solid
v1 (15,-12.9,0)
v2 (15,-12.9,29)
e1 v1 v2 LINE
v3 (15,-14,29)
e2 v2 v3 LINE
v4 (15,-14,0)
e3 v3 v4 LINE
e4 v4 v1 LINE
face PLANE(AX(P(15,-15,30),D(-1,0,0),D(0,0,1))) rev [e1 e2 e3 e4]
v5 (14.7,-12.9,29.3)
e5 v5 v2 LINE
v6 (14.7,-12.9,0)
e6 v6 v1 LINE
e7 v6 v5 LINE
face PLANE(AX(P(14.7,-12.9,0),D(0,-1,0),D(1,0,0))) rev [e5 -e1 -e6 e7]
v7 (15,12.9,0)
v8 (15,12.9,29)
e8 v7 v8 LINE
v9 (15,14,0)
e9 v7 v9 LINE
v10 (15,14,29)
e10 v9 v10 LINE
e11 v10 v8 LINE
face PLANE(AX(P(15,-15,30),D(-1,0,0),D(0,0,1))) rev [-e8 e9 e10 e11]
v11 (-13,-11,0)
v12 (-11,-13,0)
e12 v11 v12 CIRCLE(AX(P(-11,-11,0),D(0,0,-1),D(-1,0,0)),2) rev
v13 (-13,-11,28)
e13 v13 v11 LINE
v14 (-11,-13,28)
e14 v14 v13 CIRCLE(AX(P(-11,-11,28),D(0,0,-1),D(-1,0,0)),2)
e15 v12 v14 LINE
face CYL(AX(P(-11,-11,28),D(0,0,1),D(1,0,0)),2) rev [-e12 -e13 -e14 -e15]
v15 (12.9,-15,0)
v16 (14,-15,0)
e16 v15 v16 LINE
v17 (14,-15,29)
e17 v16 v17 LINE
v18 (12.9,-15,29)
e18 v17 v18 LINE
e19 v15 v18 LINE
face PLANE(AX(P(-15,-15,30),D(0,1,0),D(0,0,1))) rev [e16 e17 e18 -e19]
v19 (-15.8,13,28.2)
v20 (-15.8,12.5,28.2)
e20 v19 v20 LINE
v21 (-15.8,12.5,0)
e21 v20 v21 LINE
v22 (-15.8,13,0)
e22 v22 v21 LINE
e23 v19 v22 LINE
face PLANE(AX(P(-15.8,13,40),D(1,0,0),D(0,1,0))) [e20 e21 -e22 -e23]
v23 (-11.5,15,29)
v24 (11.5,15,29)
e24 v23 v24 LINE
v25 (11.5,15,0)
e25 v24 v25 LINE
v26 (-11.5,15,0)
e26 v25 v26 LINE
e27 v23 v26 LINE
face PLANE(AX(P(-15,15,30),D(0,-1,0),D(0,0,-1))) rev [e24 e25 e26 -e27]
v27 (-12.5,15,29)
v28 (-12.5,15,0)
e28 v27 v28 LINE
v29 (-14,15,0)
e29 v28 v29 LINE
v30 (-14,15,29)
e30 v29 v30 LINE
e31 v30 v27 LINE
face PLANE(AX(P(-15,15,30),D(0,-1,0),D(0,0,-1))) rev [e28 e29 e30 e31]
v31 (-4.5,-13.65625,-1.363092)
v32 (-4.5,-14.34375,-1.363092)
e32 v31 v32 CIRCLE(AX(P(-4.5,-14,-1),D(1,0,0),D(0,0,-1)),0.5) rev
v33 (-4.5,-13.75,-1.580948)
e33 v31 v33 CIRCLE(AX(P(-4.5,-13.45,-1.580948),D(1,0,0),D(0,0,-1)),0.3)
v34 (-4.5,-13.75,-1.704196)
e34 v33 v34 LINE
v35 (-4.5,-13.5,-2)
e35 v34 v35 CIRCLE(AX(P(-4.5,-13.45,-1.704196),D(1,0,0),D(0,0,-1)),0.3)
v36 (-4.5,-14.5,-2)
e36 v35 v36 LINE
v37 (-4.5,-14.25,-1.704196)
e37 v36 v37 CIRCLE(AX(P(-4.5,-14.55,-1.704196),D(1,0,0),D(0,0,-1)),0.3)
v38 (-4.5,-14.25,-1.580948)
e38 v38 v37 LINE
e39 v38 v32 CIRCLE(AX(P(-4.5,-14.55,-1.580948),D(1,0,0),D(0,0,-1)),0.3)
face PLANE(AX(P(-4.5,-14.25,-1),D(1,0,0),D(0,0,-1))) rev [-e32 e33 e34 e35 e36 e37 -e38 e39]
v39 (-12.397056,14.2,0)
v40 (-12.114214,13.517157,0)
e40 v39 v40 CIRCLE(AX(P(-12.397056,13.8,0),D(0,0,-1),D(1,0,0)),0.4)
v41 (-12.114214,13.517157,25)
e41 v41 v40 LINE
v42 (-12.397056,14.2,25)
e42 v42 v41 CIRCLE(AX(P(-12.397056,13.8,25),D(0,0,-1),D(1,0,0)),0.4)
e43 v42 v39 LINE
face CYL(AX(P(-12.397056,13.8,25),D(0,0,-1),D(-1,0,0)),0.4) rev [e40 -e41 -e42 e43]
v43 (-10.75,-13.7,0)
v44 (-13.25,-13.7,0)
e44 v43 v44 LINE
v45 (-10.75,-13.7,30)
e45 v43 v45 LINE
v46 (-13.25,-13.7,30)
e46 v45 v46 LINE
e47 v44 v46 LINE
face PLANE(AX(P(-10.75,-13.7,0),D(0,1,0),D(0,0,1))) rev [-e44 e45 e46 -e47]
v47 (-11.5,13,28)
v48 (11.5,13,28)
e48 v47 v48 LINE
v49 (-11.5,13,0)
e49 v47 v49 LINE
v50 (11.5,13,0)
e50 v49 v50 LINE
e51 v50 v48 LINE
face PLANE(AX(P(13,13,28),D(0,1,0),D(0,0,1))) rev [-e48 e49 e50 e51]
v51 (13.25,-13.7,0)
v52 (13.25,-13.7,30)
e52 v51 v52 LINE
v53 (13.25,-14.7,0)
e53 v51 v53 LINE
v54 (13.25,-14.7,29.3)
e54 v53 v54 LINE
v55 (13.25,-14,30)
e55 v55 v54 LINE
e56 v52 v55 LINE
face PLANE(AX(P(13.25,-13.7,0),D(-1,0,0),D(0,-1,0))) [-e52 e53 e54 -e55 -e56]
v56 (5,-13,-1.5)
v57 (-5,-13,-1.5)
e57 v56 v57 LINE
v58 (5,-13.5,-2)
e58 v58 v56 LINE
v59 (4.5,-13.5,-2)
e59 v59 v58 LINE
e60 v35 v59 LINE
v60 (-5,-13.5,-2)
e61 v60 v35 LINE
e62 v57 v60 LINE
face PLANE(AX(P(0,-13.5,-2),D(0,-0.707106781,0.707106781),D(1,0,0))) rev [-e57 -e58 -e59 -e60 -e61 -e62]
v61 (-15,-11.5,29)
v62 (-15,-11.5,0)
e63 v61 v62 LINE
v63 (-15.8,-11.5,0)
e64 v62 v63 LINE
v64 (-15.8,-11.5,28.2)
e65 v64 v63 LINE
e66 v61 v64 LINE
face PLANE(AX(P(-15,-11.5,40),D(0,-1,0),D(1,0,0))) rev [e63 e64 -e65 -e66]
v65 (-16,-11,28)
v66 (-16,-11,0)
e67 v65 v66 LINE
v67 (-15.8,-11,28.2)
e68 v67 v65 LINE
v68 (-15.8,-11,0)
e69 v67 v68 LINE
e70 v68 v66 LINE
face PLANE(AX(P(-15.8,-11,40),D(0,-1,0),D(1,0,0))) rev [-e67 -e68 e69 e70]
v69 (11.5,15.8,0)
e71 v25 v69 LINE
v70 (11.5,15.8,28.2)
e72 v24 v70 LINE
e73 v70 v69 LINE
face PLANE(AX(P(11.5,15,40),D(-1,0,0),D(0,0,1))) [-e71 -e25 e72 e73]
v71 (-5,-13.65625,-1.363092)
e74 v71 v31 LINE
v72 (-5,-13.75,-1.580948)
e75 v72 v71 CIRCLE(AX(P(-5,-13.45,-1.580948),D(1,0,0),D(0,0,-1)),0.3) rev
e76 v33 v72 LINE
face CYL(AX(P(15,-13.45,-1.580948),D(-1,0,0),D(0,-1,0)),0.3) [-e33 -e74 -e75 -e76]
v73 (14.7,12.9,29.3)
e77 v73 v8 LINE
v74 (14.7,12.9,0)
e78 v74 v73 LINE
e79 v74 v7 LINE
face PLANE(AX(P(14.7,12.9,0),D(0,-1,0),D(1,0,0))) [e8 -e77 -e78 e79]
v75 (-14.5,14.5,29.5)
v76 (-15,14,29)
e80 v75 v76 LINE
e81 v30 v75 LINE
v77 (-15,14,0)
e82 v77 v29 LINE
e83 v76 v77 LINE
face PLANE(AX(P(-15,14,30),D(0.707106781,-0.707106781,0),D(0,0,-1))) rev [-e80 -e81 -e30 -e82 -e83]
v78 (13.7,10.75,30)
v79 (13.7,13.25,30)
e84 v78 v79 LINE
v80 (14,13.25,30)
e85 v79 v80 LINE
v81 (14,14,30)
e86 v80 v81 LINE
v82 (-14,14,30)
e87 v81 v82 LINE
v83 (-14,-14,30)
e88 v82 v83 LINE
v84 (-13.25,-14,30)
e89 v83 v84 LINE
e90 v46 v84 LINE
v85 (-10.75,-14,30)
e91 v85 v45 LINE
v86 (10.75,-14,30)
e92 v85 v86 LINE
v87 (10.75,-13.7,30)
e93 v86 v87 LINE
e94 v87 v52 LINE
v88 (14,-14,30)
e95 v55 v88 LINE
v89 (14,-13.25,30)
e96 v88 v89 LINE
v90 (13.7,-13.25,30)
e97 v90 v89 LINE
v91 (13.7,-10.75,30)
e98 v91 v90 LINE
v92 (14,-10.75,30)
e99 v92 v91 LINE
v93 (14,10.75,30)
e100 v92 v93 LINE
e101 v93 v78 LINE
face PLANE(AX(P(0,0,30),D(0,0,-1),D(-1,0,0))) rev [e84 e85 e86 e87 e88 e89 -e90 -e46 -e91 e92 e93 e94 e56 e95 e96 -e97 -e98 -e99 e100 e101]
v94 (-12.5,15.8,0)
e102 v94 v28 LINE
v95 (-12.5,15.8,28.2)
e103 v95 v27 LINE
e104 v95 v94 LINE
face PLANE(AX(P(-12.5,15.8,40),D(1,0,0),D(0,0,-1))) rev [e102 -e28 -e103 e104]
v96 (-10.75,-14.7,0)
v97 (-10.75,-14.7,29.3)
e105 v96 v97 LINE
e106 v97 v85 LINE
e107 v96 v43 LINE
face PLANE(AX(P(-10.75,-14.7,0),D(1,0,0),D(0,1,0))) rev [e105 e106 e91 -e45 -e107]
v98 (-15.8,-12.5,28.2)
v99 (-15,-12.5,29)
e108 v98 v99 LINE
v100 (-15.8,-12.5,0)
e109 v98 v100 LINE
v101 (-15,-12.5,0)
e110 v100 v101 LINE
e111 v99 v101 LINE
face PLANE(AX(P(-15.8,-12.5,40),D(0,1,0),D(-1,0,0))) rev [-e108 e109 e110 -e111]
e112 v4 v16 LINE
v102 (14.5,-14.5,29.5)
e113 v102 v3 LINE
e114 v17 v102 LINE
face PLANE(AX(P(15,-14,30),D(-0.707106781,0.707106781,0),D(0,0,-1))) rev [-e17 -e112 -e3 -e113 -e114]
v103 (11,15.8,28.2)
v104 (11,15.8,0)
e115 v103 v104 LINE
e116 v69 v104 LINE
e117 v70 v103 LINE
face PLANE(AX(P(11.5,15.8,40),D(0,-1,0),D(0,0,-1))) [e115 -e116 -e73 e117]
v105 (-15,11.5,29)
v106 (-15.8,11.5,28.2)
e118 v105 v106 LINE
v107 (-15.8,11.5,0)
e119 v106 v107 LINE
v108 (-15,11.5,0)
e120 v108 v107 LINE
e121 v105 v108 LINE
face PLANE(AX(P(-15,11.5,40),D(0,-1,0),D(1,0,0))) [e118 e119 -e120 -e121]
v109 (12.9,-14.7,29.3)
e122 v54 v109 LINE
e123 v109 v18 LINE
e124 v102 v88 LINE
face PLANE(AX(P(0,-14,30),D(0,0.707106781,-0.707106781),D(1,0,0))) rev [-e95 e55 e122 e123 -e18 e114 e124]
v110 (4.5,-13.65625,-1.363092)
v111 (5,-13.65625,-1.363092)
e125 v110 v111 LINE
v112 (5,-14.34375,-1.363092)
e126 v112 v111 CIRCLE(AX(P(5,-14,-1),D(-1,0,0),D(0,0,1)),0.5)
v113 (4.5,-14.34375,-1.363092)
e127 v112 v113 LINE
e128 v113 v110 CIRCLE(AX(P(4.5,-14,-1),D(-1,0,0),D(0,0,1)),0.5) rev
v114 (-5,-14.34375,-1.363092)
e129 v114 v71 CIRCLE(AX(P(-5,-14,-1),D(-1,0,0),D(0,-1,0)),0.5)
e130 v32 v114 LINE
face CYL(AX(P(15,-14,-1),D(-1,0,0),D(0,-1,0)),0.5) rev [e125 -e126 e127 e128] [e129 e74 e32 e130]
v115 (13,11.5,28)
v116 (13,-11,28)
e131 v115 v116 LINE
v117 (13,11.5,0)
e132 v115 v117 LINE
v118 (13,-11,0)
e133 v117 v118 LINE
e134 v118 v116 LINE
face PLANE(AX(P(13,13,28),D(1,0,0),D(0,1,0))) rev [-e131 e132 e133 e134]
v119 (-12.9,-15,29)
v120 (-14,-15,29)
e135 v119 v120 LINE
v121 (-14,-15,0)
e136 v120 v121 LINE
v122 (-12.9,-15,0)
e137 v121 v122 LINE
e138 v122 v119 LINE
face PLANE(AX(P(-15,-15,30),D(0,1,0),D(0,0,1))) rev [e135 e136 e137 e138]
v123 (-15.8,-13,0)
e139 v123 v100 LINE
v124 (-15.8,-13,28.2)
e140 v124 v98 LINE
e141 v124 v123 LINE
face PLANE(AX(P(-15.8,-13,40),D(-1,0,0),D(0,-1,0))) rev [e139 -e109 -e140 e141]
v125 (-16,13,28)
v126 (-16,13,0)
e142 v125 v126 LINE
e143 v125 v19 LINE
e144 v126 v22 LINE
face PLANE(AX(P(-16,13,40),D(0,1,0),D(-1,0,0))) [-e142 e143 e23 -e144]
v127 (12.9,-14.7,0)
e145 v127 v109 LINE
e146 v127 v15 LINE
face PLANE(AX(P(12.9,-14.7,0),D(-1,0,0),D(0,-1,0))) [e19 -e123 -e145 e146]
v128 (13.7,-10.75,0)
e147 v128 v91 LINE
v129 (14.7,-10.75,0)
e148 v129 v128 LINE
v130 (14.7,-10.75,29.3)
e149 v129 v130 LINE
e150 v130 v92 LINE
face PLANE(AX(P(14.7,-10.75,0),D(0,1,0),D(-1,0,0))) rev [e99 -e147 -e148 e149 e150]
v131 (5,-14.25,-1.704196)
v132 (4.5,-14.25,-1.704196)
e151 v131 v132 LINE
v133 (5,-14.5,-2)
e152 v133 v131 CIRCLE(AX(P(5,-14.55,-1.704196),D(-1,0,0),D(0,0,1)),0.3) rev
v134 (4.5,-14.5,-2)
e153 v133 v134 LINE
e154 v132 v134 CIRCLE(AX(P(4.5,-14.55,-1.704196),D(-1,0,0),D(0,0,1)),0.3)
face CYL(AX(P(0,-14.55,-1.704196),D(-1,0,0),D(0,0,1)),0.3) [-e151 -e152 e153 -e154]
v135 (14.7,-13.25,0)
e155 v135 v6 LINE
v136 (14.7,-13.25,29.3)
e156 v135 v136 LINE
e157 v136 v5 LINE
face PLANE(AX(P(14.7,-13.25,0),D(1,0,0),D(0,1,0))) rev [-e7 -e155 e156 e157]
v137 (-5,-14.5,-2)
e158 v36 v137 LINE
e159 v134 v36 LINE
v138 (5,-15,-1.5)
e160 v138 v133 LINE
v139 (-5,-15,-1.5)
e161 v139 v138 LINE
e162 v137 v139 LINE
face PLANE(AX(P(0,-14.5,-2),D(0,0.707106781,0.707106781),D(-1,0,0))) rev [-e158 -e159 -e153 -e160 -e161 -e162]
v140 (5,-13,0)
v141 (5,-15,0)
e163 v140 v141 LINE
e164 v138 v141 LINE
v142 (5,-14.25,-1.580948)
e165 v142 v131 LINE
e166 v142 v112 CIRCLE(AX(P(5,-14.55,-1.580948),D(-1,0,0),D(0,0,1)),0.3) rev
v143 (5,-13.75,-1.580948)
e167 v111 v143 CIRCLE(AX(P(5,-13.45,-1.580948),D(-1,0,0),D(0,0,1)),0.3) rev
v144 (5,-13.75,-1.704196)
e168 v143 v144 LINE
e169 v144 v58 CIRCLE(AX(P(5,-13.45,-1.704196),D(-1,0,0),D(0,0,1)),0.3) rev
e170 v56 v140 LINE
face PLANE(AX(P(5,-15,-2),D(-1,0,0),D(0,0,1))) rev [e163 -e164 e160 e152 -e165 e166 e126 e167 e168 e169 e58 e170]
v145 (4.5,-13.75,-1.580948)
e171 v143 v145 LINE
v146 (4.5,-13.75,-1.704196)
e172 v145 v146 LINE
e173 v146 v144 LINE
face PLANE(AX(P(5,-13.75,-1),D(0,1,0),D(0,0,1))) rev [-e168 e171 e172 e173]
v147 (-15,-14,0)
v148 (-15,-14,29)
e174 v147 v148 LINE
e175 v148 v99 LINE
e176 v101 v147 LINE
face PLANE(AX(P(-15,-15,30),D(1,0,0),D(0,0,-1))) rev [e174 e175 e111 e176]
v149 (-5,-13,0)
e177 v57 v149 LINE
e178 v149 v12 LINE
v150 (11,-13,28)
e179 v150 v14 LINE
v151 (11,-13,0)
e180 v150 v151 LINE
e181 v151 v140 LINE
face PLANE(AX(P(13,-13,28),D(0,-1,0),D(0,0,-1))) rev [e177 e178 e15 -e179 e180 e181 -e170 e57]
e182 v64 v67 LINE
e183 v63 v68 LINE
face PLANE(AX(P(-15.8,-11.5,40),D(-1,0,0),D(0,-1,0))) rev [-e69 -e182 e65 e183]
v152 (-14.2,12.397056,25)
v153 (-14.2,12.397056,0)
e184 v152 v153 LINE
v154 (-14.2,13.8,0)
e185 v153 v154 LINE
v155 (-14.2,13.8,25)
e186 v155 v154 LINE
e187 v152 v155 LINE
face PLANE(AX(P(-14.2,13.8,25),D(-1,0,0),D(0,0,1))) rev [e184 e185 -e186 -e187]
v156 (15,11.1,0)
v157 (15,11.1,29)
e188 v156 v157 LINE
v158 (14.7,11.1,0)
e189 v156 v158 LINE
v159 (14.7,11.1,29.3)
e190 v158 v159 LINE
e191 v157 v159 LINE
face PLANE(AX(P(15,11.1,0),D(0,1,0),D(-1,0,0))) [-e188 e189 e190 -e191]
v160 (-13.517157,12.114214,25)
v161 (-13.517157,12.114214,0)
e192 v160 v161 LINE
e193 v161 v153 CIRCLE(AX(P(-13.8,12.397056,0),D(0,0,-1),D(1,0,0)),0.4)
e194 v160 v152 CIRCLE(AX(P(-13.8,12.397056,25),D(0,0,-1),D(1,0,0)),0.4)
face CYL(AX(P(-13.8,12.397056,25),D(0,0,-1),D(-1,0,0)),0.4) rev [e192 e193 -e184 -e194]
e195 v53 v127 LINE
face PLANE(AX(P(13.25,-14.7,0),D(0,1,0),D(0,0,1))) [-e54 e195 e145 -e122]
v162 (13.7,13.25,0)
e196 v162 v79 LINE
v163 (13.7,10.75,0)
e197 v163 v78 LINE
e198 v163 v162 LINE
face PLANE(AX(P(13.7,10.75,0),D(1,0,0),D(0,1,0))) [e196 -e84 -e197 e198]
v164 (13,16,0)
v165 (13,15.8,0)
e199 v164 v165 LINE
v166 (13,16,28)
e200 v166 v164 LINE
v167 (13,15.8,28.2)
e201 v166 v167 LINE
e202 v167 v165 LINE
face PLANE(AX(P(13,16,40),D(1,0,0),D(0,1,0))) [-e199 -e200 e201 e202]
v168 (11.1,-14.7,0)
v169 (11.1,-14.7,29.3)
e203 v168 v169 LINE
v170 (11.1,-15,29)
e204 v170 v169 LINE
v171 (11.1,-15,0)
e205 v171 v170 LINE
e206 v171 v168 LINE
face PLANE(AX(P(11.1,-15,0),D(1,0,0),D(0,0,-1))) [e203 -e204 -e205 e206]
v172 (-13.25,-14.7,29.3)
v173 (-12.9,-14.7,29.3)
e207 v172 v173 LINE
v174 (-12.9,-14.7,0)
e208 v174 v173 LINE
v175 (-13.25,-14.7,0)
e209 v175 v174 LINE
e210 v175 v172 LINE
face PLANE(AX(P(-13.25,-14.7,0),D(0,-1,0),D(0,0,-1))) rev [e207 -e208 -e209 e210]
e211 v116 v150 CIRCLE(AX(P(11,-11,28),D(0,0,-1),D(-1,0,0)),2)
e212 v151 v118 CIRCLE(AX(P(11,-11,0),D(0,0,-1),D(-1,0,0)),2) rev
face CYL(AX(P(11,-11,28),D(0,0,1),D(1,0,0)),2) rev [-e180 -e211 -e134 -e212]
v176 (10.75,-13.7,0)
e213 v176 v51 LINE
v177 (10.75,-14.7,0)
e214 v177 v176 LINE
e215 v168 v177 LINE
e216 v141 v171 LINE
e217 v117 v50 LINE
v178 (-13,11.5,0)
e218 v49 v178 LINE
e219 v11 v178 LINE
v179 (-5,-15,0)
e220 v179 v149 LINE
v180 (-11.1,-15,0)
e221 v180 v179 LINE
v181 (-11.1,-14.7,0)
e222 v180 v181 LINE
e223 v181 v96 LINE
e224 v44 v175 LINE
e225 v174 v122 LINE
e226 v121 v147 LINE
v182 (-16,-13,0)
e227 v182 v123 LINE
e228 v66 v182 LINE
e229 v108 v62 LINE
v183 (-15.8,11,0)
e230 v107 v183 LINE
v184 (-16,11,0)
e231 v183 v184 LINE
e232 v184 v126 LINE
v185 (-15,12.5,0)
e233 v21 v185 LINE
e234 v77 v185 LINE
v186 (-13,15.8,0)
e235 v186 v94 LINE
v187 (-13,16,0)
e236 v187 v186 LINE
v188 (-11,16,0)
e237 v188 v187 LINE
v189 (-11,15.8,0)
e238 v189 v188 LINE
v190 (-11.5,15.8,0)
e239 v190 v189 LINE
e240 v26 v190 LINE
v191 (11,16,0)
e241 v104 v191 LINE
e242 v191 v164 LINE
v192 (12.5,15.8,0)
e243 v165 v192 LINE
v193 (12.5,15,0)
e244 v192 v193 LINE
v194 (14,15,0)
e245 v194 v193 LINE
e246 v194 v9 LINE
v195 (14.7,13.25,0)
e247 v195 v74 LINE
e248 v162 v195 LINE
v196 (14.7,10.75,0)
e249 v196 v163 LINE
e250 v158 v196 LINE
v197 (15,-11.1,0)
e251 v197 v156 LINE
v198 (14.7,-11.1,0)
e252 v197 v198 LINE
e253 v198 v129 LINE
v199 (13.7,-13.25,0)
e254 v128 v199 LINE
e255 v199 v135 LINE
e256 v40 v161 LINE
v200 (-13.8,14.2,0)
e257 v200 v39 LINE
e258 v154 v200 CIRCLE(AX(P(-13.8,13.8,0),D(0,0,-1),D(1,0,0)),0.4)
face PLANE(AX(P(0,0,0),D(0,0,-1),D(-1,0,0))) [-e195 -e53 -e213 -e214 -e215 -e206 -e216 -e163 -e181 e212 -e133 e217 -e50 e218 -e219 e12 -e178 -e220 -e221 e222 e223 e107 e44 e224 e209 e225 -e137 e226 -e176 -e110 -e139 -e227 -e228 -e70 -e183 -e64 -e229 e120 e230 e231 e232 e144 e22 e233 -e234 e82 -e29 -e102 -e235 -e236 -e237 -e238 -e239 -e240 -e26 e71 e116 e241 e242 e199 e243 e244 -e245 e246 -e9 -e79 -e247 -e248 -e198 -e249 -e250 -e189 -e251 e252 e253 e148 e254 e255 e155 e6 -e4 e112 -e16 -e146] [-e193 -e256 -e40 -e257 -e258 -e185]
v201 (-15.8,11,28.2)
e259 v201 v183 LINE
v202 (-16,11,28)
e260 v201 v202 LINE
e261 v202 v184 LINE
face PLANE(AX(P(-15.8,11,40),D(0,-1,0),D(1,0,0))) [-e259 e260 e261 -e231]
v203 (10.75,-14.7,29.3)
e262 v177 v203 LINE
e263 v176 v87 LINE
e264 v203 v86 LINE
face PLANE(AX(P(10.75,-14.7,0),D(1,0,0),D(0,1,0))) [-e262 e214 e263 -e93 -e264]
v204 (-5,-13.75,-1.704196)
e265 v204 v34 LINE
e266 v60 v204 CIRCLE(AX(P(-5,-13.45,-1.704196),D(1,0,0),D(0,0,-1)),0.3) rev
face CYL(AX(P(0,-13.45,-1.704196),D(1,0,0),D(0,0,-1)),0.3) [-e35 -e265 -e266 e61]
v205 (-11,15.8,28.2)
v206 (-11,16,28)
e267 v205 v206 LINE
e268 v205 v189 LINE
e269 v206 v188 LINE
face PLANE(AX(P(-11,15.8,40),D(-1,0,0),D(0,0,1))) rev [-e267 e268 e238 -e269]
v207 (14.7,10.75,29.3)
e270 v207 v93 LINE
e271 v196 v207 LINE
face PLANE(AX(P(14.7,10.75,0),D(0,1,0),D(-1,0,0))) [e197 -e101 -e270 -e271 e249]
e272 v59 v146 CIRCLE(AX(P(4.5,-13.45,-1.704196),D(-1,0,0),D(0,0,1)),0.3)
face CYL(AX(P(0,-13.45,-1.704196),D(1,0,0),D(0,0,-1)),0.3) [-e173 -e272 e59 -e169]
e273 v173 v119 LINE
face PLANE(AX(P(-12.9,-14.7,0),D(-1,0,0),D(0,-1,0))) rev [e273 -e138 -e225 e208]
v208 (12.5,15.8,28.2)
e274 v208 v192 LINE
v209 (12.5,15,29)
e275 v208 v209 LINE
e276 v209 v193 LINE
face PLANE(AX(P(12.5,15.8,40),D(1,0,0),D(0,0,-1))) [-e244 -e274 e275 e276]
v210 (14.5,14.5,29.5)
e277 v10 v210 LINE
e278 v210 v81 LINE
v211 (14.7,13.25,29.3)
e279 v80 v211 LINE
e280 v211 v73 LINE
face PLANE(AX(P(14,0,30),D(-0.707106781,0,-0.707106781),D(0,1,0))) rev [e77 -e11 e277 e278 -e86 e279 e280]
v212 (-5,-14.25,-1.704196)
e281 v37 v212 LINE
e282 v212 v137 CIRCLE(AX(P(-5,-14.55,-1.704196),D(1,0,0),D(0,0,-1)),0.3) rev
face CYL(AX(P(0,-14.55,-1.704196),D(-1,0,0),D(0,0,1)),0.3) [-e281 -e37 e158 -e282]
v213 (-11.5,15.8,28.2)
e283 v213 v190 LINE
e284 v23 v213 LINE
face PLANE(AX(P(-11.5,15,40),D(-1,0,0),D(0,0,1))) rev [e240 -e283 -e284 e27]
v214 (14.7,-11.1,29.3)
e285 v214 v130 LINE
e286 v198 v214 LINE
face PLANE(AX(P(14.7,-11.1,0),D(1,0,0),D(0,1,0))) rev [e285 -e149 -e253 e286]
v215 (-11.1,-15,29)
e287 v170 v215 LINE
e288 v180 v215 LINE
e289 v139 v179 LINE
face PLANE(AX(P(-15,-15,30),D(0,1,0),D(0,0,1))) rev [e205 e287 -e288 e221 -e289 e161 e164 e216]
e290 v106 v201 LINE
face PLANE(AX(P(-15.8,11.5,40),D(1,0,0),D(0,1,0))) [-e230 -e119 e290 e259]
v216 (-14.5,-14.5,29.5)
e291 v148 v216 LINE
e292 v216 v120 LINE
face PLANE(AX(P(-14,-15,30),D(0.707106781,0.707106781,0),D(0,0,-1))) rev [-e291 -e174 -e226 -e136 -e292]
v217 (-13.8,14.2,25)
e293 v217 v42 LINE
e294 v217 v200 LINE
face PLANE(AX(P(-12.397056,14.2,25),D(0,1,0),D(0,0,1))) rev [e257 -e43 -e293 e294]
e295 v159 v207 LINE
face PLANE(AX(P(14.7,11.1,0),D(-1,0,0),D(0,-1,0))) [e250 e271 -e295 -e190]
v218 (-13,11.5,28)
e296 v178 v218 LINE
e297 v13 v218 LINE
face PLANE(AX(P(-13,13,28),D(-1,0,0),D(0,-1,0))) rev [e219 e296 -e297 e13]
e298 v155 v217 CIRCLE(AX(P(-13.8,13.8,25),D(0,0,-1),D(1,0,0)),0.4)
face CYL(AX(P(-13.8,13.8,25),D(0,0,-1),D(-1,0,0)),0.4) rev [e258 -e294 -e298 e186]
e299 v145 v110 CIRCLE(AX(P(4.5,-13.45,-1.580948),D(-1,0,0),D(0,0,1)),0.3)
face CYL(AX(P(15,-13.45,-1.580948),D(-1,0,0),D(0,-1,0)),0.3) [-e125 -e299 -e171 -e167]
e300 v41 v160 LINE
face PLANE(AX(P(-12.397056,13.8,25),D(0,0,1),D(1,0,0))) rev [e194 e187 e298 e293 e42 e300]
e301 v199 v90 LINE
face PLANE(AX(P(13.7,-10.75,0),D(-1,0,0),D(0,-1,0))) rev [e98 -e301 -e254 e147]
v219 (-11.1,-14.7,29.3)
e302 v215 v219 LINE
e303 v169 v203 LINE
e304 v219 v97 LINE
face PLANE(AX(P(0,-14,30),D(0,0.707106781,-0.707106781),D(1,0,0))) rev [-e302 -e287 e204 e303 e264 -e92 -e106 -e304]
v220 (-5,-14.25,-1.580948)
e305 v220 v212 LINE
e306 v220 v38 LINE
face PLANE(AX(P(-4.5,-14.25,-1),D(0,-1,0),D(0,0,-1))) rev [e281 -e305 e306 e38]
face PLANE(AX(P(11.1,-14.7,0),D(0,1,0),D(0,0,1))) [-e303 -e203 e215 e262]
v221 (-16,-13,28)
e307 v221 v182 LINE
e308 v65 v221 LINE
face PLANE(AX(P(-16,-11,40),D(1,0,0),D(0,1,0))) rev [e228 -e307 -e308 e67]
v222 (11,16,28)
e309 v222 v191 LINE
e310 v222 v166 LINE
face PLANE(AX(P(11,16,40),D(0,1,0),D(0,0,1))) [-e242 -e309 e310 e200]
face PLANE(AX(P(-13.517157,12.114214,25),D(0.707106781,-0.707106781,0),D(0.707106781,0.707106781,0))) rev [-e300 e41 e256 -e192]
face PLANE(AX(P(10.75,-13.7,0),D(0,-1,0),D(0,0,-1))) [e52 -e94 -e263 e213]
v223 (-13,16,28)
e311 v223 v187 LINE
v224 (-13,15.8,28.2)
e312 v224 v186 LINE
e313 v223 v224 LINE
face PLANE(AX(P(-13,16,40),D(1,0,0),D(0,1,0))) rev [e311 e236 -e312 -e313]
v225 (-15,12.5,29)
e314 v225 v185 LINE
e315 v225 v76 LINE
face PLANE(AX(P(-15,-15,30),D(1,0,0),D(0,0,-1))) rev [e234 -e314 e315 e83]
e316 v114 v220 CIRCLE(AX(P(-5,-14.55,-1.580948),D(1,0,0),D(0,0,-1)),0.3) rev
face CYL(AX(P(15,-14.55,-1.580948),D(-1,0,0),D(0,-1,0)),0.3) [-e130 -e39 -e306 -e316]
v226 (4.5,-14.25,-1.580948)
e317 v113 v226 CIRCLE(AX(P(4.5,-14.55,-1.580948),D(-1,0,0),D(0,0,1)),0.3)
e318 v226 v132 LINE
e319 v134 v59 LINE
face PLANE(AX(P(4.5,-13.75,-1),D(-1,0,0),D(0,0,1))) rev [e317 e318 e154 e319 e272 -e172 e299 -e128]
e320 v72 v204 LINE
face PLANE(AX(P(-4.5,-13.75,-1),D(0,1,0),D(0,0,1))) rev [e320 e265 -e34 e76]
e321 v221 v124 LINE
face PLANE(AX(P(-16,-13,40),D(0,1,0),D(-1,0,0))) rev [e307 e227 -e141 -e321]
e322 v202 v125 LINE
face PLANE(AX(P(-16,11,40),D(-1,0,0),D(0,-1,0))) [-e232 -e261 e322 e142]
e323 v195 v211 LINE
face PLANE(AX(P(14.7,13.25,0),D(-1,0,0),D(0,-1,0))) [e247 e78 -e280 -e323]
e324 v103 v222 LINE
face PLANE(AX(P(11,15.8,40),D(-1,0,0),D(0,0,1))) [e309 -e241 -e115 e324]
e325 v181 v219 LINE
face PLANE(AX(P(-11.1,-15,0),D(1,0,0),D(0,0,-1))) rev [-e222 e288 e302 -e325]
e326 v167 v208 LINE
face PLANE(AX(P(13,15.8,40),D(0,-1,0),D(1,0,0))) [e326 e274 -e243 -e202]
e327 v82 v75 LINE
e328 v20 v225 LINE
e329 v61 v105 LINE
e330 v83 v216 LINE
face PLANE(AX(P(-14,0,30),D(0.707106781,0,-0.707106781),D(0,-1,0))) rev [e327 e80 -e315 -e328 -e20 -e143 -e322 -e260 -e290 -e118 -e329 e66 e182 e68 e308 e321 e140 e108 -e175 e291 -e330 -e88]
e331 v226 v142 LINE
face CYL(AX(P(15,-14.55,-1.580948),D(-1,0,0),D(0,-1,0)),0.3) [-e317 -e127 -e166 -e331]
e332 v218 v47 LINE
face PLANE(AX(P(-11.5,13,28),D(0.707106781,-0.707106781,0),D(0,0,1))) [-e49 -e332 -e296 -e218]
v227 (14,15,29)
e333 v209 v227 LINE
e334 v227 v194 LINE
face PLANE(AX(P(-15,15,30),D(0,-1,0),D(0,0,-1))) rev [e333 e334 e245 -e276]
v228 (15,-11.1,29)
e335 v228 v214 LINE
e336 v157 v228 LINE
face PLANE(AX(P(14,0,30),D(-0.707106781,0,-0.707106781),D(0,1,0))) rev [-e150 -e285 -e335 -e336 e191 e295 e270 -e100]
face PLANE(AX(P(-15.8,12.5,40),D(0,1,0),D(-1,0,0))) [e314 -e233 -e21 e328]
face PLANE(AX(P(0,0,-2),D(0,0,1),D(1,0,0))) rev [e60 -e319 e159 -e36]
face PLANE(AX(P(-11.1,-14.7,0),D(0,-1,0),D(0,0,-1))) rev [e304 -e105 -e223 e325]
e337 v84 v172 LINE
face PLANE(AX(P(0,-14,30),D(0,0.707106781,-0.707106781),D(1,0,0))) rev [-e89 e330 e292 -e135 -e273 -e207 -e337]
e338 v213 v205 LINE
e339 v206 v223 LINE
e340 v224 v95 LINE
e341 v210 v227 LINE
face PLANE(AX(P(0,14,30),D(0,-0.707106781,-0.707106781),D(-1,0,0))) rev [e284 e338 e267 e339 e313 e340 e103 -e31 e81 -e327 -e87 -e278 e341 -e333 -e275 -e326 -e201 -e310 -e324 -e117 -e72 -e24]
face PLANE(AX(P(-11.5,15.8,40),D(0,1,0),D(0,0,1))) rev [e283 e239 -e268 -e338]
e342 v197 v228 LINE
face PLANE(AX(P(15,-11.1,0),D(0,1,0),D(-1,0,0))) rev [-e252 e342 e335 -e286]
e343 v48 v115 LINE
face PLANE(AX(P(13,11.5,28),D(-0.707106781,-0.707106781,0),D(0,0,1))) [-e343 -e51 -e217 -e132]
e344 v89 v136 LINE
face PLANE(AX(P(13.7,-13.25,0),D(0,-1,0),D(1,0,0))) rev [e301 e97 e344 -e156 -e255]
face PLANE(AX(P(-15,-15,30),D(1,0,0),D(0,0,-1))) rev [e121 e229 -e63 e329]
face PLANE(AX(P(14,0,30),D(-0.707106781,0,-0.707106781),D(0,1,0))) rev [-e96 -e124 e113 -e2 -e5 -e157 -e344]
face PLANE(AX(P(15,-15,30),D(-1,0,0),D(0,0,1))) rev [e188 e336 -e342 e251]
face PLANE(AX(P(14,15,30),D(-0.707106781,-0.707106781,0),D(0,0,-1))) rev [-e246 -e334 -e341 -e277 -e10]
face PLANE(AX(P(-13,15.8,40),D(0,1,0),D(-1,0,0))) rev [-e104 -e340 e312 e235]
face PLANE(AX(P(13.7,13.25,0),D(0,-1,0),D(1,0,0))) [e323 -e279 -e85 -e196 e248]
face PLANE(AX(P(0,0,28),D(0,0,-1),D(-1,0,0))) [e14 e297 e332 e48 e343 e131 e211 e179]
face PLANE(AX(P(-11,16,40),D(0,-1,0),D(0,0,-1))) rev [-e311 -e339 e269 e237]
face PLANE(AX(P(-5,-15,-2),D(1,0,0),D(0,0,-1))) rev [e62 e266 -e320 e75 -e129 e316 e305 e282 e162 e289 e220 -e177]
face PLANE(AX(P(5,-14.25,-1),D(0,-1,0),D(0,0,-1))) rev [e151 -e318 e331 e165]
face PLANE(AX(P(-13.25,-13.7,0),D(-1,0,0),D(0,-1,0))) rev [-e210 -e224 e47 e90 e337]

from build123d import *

# Parameters (mm, degrees)
SKETCH_1_W                      = 30
SKETCH_1_H                      = 30
EXTRUDE_1_DEPTH                 = 30
CHAMFER_6_SIZE                  = 1
EXTRUDE_3_DEPTH                 = 40
PATTERN_CIRCULAR_8_COUNT        = 2
PATTERN_CIRCULAR_8_ANGLE        = 270
PATTERN_CIRCULAR_8_COPY_1_DEPTH = 40
SKETCH_16_W                     = 12.549729198
SKETCH_16_H                     = 35.597789554
CUT_EXTRUDE_8_DEPTH             = 50
SKETCH_17_W                     = 46.119781587
SKETCH_17_H                     = 25.089994046
CUT_EXTRUDE_10_DEPTH            = 50
CUT_EXTRUDE_2_DEPTH             = 30
PATTERN_CIRCULAR_1_COUNT        = 2
PATTERN_CIRCULAR_1_ANGLE        = 270
PATTERN_CIRCULAR_1_COPY_1_DEPTH = 30
CHAMFER_5_SIZE                  = 1
SKETCH_2_W                      = 26
SKETCH_2_H                      = 26
CUT_EXTRUDE_1_DEPTH             = 28
FILLET_1_R                      = 2
CHAMFER_1_SIZE                  = 1.5
CUT_EXTRUDE_3_DEPTH             = 25
SKETCH_12_W                     = 10
SKETCH_12_H                     = 2
EXTRUDE_6_DEPTH                 = 2
SKETCH_13_R                     = 0.5
CUT_EXTRUDE_6_DEPTH             = 40.446165847
SKETCH_14_W                     = 0.5
SKETCH_14_H                     = 0.5
CUT_EXTRUDE_7_DEPTH             = 1
CHAMFER_8_SIZE                  = 0.5
FILLET_6_R                      = 0.3


with BuildPart() as part:
    # 草图1 → 凸台-拉伸1 (new body)
    with BuildSketch(Plane.XY):
        Rectangle(SKETCH_1_W, SKETCH_1_H)
    extrude(amount=EXTRUDE_1_DEPTH)

    # 倒角6
    chamfer_6_edges = [part.edges().sort_by_distance(p)[0] for p in [
        (-15, 0, 30),
        (0, -15, 30),
        (15, 0, 30),
        (0, 15, 30),
    ]]
    chamfer(chamfer_6_edges, length=CHAMFER_6_SIZE)

    # 草图6 → 凸台-拉伸3 (add)
    with BuildSketch(Plane.XY):
        Polygon((-12.5, 15), (-11.5, 15), (-11.5, 15.8), (-11, 15.8), (-11, 16), (-13, 16), (-13, 15.8), (-12.5, 15.8), align=None)
    extrude_3 = extrude(amount=EXTRUDE_3_DEPTH)

    # 镜向4: 凸台-拉伸3 across plane
    add(extrude_3.mirror(Plane(origin=(0, 0, 0), x_dir=(0, 0, 1), z_dir=(1, 0, 0))))

    # 阵列(圆周)8: 凸台-拉伸3 ×2 about axis
    pattern_circular_8_axis = Axis((0, 0, 0), (0, 0, -1))
    for i in range(1, PATTERN_CIRCULAR_8_COUNT):
        add(extrude_3.rotate(pattern_circular_8_axis, i * PATTERN_CIRCULAR_8_ANGLE / (PATTERN_CIRCULAR_8_COUNT - 1)))

    # 阵列(圆周)8 copy 1 sketch → 阵列(圆周)8 copy 1 (add)
    with BuildSketch(Plane(origin=(0, 0, 0), x_dir=(0, -1, 0), z_dir=(0, 0, 1))):
        Polygon((-12.5, -15), (-11.5, -15), (-11.5, -15.8), (-11, -15.8), (-11, -16), (-13, -16), (-13, -15.8), (-12.5, -15.8), align=None)
    extrude(amount=PATTERN_CIRCULAR_8_COPY_1_DEPTH)

    # 草图16 → 切除-拉伸8 (cut, along a direction that is not the sketch's normal)
    with BuildSketch(Plane(origin=(-22, 0, 22), x_dir=(0.7071067811865475, 0, 0.7071067811865477), z_dir=(-0.7071067811865477, 0, 0.7071067811865475))):
        with Locations((10.913675879, 1.48547553)):
            Rectangle(SKETCH_16_W, SKETCH_16_H)
    extrude(amount=CUT_EXTRUDE_8_DEPTH, dir=(0, 0, 1), mode=Mode.SUBTRACT)

    # 草图17 → 切除-拉伸10 (cut, along a direction that is not the sketch's normal)
    with BuildSketch(Plane(origin=(0, 22, 22), x_dir=(1, 0, 0), z_dir=(0, 0.7071067811865477, 0.7071067811865475))):
        with Locations((-2.061617887, -8.781830855)):
            Rectangle(SKETCH_17_W, SKETCH_17_H)
    extrude(amount=CUT_EXTRUDE_10_DEPTH, dir=(0, 0, 1), mode=Mode.SUBTRACT)

    # 草图8 → 切除-拉伸2 (cut)
    with BuildSketch(Plane.XY.offset(30)):
        Polygon((-12.9, -15), (-11.1, -15), (-11.1, -14.7), (-10.75, -14.7), (-10.75, -13.7), (-13.25, -13.7), (-13.25, -14.7), (-12.9, -14.7), align=None)
    cut_extrude_2 = extrude(amount=-CUT_EXTRUDE_2_DEPTH, mode=Mode.SUBTRACT)

    # 镜向1: 切除-拉伸2 across plane
    add(cut_extrude_2.mirror(Plane(origin=(0, 0, 0), x_dir=(0, 0, 1), z_dir=(1, 0, 0))), mode=Mode.SUBTRACT)

    # 阵列(圆周)1: 切除-拉伸2 ×2 about axis
    pattern_circular_1_axis = Axis((0, 0, 0), (0, 0, -1))
    for i in range(1, PATTERN_CIRCULAR_1_COUNT):
        add(cut_extrude_2.rotate(pattern_circular_1_axis, i * PATTERN_CIRCULAR_1_ANGLE / (PATTERN_CIRCULAR_1_COUNT - 1)), mode=Mode.SUBTRACT)

    # 阵列(圆周)1 copy 1 sketch → 阵列(圆周)1 copy 1 (cut)
    with BuildSketch(Plane(origin=(0, 0, 30), x_dir=(0, -1, 0), z_dir=(0, 0, 1))):
        Polygon((-12.9, 15), (-11.1, 15), (-11.1, 14.7), (-10.75, 14.7), (-10.75, 13.7), (-13.25, 13.7), (-13.25, 14.7), (-12.9, 14.7), align=None)
    extrude(amount=-PATTERN_CIRCULAR_1_COPY_1_DEPTH, mode=Mode.SUBTRACT)

    # 倒角5
    chamfer_5_edges = [part.edges().sort_by_distance(p)[0] for p in [
        (15, -15, 14.5),
        (-15, -15, 14.5),
        (15, 15, 14.5),
        (-15, 15, 14.5),
    ]]
    chamfer(chamfer_5_edges, length=CHAMFER_5_SIZE)

    # 草图2 → 切除-拉伸1 (cut)
    with BuildSketch(Plane(origin=(0, 0, 0), x_dir=(-1, 0, 0), z_dir=(0, 0, -1))):
        Rectangle(SKETCH_2_W, SKETCH_2_H)
    extrude(amount=-CUT_EXTRUDE_1_DEPTH, mode=Mode.SUBTRACT)

    # 圆角1
    fillet_1_edges = [part.edges().sort_by_distance(p)[0] for p in [
        (13, -13, 14),
        (-13, -13, 14),
    ]]
    fillet(fillet_1_edges, radius=FILLET_1_R)

    # 倒角1
    chamfer_1_edges = [part.edges().sort_by_distance(p)[0] for p in [
        (13, 13, 14),
        (-13, 13, 14),
    ]]
    chamfer(chamfer_1_edges, length=CHAMFER_1_SIZE)

    # 草图9 → 切除-拉伸3 (cut)
    with BuildSketch(Plane(origin=(0, 0, 0), x_dir=(-1, 0, 0), z_dir=(0, 0, -1))):
        with BuildLine():
            Line((12.397056275, 14.2), (13.8, 14.2))
            ThreePointArc((13.8, 14.2), (14.082842712, 14.082842712), (14.2, 13.8))
            Line((14.2, 13.8), (14.2, 12.397056275))
            ThreePointArc((14.2, 12.397056275), (13.953073373, 12.027504462), (13.517157288, 12.114213562))
            Line((13.517157288, 12.114213562), (12.114213562, 13.517157288))
            ThreePointArc((12.114213562, 13.517157288), (12.027504462, 13.953073373), (12.397056275, 14.2))
        make_face()
    extrude(amount=-CUT_EXTRUDE_3_DEPTH, mode=Mode.SUBTRACT)

    # 草图12 → 凸台-拉伸6 (add)
    with BuildSketch(Plane(origin=(0, 0, 0), x_dir=(-1, 0, 0), z_dir=(0, 0, -1))):
        with Locations((0, -14)):
            Rectangle(SKETCH_12_W, SKETCH_12_H)
    extrude(amount=EXTRUDE_6_DEPTH)

    # 草图13 → 切除-拉伸6 (cut, through all)
    with BuildSketch(Plane.ZY.offset(5)):
        with Locations(Location((-1, -14, 0), (0, 0, 270))):
            Circle(SKETCH_13_R)
    extrude(amount=-CUT_EXTRUDE_6_DEPTH, mode=Mode.SUBTRACT)

    # 草图14 → 切除-拉伸7 (cut)
    with BuildSketch(Plane(origin=(0, 0, -2), x_dir=(-1, 0, 0), z_dir=(0, 0, -1))):
        with Locations((-4.75, -14)):
            Rectangle(SKETCH_14_W, SKETCH_14_H)
        with Locations((4.75, -14)):
            Rectangle(SKETCH_14_W, SKETCH_14_H)
    extrude(amount=-CUT_EXTRUDE_7_DEPTH, mode=Mode.SUBTRACT)

    # 倒角8
    chamfer_8_edges = [part.edges().sort_by_distance(p)[0] for p in [
        (0, -15, -2),
        (0, -13, -2),
    ]]
    chamfer(chamfer_8_edges, length=CHAMFER_8_SIZE)

    # 圆角6
    # the kernel refuses this fillet: 0.3 mm, written as the material it takes off along each edge
    with BuildSketch(Plane(origin=(-4.5, -14.25, -1.433012702), x_dir=(0, -0.8016059252125737, 0.5978527750743438), z_dir=(-1, 0, 0))) as fillet_6_piece_1:
        with BuildLine():
            CenterArc((0.152038547, -0.297941245), FILLET_6_R, 96.716268279, 46.567463442)
            Line((-0.088443231, -0.118585412), (-0.093252866, -0.114998296))
            Line((-0.093252866, -0.114998296), (-0.004809636, 0.003587117))
            Line((-0.004809636, 0.003587117), (0.000701716, 0.005958825))
            ThreePointArc((0.000701716, 0.005958825), (0.058476364, 0.002568741), (0.116251012, 0.005958825))
            Line((0.116251012, 0.005958825), (0.116952728, 0))
        make_face()
    extrude(amount=0.869837, mode=Mode.SUBTRACT)
    with BuildSketch(Plane(origin=(-4.5, -13.75, -1.433012702), x_dir=(0, 0.8016059252125791, 0.5978527750743364), z_dir=(-1, 0, 0)), Plane(origin=(5.369837, -13.75, -1.433012702), x_dir=(0, 0.8016059252125827, 0.5978527750743317), z_dir=(-1, 0, 0))) as fillet_6_piece_2:
        with BuildLine():
            CenterArc((0.152038547, 0.297941245), FILLET_6_R, 216.716268279, 46.567463442)
            Line((-0.088443231, 0.118585412), (-0.093252866, 0.114998296))
            Line((-0.093252866, 0.114998296), (-0.004809636, -0.003587117))
            Line((-0.004809636, -0.003587117), (0.000701716, -0.005958825))
            ThreePointArc((0.000701716, -0.005958825), (0.058476364, -0.002568741), (0.116251012, -0.005958825))
            Line((0.116251012, -0.005958825), (0.116952728, 0))
        make_face()
    extrude(amount=0.869837, mode=Mode.SUBTRACT)
    with BuildSketch(Plane(origin=(-5.739509973, -14.25, -2), x_dir=(0, -1, 0), z_dir=(1, 0, 0)), Plane(origin=(-4.5, -13.75, -2), x_dir=(0, 1, 0), z_dir=(-1, 0, 0)), Plane(origin=(4.5, -14.25, -2), x_dir=(0, -1, 0), z_dir=(1, 0, 0)), Plane(origin=(5.739509973, -13.75, -2), x_dir=(0, 1, 0), z_dir=(-1, 0, 0))) as fillet_6_piece_3:
        with BuildLine():
            CenterArc((0.3, -0.295803989), FILLET_6_R, 99.594068227, 80.405931773)
            Line((0, -0.295803989), (-0.006, -0.295803989))
            Line((-0.006, -0.295803989), (-0.006, 0))
            Line((-0.006, 0), (0, 0.006))
            ThreePointArc((0, 0.006), (0.125, 0.006), (0.249, 0.00591608))
            Line((0.249, 0.00591608), (0.25, 0))
        make_face()
    extrude(amount=1.239509973, mode=Mode.SUBTRACT)
    with BuildSketch(Plane(origin=(5.369837, -14.25, -1.433012702), x_dir=(0, 0, -1), z_dir=(-1, 0, 0))) as fillet_6_piece_4:
        with BuildLine():
            CenterArc((0.1479348, 0.3), FILLET_6_R, 223.432536558, 46.567463442)
            Line((-0.069920513, 0.09375), (-0.074277619, 0.089625))
            ThreePointArc((-0.074277619, 0.089625), (-0.037019375, 0.045339271), (-0.005196152, -0.003))
            Line((-0.005196152, -0.003), (0, -0.006))
            Line((0, -0.006), (0.1479348, -0.006))
            Line((0.1479348, -0.006), (0.1479348, 0))
        make_face()
    extrude(amount=0.869837, mode=Mode.SUBTRACT)


solid = part.part
